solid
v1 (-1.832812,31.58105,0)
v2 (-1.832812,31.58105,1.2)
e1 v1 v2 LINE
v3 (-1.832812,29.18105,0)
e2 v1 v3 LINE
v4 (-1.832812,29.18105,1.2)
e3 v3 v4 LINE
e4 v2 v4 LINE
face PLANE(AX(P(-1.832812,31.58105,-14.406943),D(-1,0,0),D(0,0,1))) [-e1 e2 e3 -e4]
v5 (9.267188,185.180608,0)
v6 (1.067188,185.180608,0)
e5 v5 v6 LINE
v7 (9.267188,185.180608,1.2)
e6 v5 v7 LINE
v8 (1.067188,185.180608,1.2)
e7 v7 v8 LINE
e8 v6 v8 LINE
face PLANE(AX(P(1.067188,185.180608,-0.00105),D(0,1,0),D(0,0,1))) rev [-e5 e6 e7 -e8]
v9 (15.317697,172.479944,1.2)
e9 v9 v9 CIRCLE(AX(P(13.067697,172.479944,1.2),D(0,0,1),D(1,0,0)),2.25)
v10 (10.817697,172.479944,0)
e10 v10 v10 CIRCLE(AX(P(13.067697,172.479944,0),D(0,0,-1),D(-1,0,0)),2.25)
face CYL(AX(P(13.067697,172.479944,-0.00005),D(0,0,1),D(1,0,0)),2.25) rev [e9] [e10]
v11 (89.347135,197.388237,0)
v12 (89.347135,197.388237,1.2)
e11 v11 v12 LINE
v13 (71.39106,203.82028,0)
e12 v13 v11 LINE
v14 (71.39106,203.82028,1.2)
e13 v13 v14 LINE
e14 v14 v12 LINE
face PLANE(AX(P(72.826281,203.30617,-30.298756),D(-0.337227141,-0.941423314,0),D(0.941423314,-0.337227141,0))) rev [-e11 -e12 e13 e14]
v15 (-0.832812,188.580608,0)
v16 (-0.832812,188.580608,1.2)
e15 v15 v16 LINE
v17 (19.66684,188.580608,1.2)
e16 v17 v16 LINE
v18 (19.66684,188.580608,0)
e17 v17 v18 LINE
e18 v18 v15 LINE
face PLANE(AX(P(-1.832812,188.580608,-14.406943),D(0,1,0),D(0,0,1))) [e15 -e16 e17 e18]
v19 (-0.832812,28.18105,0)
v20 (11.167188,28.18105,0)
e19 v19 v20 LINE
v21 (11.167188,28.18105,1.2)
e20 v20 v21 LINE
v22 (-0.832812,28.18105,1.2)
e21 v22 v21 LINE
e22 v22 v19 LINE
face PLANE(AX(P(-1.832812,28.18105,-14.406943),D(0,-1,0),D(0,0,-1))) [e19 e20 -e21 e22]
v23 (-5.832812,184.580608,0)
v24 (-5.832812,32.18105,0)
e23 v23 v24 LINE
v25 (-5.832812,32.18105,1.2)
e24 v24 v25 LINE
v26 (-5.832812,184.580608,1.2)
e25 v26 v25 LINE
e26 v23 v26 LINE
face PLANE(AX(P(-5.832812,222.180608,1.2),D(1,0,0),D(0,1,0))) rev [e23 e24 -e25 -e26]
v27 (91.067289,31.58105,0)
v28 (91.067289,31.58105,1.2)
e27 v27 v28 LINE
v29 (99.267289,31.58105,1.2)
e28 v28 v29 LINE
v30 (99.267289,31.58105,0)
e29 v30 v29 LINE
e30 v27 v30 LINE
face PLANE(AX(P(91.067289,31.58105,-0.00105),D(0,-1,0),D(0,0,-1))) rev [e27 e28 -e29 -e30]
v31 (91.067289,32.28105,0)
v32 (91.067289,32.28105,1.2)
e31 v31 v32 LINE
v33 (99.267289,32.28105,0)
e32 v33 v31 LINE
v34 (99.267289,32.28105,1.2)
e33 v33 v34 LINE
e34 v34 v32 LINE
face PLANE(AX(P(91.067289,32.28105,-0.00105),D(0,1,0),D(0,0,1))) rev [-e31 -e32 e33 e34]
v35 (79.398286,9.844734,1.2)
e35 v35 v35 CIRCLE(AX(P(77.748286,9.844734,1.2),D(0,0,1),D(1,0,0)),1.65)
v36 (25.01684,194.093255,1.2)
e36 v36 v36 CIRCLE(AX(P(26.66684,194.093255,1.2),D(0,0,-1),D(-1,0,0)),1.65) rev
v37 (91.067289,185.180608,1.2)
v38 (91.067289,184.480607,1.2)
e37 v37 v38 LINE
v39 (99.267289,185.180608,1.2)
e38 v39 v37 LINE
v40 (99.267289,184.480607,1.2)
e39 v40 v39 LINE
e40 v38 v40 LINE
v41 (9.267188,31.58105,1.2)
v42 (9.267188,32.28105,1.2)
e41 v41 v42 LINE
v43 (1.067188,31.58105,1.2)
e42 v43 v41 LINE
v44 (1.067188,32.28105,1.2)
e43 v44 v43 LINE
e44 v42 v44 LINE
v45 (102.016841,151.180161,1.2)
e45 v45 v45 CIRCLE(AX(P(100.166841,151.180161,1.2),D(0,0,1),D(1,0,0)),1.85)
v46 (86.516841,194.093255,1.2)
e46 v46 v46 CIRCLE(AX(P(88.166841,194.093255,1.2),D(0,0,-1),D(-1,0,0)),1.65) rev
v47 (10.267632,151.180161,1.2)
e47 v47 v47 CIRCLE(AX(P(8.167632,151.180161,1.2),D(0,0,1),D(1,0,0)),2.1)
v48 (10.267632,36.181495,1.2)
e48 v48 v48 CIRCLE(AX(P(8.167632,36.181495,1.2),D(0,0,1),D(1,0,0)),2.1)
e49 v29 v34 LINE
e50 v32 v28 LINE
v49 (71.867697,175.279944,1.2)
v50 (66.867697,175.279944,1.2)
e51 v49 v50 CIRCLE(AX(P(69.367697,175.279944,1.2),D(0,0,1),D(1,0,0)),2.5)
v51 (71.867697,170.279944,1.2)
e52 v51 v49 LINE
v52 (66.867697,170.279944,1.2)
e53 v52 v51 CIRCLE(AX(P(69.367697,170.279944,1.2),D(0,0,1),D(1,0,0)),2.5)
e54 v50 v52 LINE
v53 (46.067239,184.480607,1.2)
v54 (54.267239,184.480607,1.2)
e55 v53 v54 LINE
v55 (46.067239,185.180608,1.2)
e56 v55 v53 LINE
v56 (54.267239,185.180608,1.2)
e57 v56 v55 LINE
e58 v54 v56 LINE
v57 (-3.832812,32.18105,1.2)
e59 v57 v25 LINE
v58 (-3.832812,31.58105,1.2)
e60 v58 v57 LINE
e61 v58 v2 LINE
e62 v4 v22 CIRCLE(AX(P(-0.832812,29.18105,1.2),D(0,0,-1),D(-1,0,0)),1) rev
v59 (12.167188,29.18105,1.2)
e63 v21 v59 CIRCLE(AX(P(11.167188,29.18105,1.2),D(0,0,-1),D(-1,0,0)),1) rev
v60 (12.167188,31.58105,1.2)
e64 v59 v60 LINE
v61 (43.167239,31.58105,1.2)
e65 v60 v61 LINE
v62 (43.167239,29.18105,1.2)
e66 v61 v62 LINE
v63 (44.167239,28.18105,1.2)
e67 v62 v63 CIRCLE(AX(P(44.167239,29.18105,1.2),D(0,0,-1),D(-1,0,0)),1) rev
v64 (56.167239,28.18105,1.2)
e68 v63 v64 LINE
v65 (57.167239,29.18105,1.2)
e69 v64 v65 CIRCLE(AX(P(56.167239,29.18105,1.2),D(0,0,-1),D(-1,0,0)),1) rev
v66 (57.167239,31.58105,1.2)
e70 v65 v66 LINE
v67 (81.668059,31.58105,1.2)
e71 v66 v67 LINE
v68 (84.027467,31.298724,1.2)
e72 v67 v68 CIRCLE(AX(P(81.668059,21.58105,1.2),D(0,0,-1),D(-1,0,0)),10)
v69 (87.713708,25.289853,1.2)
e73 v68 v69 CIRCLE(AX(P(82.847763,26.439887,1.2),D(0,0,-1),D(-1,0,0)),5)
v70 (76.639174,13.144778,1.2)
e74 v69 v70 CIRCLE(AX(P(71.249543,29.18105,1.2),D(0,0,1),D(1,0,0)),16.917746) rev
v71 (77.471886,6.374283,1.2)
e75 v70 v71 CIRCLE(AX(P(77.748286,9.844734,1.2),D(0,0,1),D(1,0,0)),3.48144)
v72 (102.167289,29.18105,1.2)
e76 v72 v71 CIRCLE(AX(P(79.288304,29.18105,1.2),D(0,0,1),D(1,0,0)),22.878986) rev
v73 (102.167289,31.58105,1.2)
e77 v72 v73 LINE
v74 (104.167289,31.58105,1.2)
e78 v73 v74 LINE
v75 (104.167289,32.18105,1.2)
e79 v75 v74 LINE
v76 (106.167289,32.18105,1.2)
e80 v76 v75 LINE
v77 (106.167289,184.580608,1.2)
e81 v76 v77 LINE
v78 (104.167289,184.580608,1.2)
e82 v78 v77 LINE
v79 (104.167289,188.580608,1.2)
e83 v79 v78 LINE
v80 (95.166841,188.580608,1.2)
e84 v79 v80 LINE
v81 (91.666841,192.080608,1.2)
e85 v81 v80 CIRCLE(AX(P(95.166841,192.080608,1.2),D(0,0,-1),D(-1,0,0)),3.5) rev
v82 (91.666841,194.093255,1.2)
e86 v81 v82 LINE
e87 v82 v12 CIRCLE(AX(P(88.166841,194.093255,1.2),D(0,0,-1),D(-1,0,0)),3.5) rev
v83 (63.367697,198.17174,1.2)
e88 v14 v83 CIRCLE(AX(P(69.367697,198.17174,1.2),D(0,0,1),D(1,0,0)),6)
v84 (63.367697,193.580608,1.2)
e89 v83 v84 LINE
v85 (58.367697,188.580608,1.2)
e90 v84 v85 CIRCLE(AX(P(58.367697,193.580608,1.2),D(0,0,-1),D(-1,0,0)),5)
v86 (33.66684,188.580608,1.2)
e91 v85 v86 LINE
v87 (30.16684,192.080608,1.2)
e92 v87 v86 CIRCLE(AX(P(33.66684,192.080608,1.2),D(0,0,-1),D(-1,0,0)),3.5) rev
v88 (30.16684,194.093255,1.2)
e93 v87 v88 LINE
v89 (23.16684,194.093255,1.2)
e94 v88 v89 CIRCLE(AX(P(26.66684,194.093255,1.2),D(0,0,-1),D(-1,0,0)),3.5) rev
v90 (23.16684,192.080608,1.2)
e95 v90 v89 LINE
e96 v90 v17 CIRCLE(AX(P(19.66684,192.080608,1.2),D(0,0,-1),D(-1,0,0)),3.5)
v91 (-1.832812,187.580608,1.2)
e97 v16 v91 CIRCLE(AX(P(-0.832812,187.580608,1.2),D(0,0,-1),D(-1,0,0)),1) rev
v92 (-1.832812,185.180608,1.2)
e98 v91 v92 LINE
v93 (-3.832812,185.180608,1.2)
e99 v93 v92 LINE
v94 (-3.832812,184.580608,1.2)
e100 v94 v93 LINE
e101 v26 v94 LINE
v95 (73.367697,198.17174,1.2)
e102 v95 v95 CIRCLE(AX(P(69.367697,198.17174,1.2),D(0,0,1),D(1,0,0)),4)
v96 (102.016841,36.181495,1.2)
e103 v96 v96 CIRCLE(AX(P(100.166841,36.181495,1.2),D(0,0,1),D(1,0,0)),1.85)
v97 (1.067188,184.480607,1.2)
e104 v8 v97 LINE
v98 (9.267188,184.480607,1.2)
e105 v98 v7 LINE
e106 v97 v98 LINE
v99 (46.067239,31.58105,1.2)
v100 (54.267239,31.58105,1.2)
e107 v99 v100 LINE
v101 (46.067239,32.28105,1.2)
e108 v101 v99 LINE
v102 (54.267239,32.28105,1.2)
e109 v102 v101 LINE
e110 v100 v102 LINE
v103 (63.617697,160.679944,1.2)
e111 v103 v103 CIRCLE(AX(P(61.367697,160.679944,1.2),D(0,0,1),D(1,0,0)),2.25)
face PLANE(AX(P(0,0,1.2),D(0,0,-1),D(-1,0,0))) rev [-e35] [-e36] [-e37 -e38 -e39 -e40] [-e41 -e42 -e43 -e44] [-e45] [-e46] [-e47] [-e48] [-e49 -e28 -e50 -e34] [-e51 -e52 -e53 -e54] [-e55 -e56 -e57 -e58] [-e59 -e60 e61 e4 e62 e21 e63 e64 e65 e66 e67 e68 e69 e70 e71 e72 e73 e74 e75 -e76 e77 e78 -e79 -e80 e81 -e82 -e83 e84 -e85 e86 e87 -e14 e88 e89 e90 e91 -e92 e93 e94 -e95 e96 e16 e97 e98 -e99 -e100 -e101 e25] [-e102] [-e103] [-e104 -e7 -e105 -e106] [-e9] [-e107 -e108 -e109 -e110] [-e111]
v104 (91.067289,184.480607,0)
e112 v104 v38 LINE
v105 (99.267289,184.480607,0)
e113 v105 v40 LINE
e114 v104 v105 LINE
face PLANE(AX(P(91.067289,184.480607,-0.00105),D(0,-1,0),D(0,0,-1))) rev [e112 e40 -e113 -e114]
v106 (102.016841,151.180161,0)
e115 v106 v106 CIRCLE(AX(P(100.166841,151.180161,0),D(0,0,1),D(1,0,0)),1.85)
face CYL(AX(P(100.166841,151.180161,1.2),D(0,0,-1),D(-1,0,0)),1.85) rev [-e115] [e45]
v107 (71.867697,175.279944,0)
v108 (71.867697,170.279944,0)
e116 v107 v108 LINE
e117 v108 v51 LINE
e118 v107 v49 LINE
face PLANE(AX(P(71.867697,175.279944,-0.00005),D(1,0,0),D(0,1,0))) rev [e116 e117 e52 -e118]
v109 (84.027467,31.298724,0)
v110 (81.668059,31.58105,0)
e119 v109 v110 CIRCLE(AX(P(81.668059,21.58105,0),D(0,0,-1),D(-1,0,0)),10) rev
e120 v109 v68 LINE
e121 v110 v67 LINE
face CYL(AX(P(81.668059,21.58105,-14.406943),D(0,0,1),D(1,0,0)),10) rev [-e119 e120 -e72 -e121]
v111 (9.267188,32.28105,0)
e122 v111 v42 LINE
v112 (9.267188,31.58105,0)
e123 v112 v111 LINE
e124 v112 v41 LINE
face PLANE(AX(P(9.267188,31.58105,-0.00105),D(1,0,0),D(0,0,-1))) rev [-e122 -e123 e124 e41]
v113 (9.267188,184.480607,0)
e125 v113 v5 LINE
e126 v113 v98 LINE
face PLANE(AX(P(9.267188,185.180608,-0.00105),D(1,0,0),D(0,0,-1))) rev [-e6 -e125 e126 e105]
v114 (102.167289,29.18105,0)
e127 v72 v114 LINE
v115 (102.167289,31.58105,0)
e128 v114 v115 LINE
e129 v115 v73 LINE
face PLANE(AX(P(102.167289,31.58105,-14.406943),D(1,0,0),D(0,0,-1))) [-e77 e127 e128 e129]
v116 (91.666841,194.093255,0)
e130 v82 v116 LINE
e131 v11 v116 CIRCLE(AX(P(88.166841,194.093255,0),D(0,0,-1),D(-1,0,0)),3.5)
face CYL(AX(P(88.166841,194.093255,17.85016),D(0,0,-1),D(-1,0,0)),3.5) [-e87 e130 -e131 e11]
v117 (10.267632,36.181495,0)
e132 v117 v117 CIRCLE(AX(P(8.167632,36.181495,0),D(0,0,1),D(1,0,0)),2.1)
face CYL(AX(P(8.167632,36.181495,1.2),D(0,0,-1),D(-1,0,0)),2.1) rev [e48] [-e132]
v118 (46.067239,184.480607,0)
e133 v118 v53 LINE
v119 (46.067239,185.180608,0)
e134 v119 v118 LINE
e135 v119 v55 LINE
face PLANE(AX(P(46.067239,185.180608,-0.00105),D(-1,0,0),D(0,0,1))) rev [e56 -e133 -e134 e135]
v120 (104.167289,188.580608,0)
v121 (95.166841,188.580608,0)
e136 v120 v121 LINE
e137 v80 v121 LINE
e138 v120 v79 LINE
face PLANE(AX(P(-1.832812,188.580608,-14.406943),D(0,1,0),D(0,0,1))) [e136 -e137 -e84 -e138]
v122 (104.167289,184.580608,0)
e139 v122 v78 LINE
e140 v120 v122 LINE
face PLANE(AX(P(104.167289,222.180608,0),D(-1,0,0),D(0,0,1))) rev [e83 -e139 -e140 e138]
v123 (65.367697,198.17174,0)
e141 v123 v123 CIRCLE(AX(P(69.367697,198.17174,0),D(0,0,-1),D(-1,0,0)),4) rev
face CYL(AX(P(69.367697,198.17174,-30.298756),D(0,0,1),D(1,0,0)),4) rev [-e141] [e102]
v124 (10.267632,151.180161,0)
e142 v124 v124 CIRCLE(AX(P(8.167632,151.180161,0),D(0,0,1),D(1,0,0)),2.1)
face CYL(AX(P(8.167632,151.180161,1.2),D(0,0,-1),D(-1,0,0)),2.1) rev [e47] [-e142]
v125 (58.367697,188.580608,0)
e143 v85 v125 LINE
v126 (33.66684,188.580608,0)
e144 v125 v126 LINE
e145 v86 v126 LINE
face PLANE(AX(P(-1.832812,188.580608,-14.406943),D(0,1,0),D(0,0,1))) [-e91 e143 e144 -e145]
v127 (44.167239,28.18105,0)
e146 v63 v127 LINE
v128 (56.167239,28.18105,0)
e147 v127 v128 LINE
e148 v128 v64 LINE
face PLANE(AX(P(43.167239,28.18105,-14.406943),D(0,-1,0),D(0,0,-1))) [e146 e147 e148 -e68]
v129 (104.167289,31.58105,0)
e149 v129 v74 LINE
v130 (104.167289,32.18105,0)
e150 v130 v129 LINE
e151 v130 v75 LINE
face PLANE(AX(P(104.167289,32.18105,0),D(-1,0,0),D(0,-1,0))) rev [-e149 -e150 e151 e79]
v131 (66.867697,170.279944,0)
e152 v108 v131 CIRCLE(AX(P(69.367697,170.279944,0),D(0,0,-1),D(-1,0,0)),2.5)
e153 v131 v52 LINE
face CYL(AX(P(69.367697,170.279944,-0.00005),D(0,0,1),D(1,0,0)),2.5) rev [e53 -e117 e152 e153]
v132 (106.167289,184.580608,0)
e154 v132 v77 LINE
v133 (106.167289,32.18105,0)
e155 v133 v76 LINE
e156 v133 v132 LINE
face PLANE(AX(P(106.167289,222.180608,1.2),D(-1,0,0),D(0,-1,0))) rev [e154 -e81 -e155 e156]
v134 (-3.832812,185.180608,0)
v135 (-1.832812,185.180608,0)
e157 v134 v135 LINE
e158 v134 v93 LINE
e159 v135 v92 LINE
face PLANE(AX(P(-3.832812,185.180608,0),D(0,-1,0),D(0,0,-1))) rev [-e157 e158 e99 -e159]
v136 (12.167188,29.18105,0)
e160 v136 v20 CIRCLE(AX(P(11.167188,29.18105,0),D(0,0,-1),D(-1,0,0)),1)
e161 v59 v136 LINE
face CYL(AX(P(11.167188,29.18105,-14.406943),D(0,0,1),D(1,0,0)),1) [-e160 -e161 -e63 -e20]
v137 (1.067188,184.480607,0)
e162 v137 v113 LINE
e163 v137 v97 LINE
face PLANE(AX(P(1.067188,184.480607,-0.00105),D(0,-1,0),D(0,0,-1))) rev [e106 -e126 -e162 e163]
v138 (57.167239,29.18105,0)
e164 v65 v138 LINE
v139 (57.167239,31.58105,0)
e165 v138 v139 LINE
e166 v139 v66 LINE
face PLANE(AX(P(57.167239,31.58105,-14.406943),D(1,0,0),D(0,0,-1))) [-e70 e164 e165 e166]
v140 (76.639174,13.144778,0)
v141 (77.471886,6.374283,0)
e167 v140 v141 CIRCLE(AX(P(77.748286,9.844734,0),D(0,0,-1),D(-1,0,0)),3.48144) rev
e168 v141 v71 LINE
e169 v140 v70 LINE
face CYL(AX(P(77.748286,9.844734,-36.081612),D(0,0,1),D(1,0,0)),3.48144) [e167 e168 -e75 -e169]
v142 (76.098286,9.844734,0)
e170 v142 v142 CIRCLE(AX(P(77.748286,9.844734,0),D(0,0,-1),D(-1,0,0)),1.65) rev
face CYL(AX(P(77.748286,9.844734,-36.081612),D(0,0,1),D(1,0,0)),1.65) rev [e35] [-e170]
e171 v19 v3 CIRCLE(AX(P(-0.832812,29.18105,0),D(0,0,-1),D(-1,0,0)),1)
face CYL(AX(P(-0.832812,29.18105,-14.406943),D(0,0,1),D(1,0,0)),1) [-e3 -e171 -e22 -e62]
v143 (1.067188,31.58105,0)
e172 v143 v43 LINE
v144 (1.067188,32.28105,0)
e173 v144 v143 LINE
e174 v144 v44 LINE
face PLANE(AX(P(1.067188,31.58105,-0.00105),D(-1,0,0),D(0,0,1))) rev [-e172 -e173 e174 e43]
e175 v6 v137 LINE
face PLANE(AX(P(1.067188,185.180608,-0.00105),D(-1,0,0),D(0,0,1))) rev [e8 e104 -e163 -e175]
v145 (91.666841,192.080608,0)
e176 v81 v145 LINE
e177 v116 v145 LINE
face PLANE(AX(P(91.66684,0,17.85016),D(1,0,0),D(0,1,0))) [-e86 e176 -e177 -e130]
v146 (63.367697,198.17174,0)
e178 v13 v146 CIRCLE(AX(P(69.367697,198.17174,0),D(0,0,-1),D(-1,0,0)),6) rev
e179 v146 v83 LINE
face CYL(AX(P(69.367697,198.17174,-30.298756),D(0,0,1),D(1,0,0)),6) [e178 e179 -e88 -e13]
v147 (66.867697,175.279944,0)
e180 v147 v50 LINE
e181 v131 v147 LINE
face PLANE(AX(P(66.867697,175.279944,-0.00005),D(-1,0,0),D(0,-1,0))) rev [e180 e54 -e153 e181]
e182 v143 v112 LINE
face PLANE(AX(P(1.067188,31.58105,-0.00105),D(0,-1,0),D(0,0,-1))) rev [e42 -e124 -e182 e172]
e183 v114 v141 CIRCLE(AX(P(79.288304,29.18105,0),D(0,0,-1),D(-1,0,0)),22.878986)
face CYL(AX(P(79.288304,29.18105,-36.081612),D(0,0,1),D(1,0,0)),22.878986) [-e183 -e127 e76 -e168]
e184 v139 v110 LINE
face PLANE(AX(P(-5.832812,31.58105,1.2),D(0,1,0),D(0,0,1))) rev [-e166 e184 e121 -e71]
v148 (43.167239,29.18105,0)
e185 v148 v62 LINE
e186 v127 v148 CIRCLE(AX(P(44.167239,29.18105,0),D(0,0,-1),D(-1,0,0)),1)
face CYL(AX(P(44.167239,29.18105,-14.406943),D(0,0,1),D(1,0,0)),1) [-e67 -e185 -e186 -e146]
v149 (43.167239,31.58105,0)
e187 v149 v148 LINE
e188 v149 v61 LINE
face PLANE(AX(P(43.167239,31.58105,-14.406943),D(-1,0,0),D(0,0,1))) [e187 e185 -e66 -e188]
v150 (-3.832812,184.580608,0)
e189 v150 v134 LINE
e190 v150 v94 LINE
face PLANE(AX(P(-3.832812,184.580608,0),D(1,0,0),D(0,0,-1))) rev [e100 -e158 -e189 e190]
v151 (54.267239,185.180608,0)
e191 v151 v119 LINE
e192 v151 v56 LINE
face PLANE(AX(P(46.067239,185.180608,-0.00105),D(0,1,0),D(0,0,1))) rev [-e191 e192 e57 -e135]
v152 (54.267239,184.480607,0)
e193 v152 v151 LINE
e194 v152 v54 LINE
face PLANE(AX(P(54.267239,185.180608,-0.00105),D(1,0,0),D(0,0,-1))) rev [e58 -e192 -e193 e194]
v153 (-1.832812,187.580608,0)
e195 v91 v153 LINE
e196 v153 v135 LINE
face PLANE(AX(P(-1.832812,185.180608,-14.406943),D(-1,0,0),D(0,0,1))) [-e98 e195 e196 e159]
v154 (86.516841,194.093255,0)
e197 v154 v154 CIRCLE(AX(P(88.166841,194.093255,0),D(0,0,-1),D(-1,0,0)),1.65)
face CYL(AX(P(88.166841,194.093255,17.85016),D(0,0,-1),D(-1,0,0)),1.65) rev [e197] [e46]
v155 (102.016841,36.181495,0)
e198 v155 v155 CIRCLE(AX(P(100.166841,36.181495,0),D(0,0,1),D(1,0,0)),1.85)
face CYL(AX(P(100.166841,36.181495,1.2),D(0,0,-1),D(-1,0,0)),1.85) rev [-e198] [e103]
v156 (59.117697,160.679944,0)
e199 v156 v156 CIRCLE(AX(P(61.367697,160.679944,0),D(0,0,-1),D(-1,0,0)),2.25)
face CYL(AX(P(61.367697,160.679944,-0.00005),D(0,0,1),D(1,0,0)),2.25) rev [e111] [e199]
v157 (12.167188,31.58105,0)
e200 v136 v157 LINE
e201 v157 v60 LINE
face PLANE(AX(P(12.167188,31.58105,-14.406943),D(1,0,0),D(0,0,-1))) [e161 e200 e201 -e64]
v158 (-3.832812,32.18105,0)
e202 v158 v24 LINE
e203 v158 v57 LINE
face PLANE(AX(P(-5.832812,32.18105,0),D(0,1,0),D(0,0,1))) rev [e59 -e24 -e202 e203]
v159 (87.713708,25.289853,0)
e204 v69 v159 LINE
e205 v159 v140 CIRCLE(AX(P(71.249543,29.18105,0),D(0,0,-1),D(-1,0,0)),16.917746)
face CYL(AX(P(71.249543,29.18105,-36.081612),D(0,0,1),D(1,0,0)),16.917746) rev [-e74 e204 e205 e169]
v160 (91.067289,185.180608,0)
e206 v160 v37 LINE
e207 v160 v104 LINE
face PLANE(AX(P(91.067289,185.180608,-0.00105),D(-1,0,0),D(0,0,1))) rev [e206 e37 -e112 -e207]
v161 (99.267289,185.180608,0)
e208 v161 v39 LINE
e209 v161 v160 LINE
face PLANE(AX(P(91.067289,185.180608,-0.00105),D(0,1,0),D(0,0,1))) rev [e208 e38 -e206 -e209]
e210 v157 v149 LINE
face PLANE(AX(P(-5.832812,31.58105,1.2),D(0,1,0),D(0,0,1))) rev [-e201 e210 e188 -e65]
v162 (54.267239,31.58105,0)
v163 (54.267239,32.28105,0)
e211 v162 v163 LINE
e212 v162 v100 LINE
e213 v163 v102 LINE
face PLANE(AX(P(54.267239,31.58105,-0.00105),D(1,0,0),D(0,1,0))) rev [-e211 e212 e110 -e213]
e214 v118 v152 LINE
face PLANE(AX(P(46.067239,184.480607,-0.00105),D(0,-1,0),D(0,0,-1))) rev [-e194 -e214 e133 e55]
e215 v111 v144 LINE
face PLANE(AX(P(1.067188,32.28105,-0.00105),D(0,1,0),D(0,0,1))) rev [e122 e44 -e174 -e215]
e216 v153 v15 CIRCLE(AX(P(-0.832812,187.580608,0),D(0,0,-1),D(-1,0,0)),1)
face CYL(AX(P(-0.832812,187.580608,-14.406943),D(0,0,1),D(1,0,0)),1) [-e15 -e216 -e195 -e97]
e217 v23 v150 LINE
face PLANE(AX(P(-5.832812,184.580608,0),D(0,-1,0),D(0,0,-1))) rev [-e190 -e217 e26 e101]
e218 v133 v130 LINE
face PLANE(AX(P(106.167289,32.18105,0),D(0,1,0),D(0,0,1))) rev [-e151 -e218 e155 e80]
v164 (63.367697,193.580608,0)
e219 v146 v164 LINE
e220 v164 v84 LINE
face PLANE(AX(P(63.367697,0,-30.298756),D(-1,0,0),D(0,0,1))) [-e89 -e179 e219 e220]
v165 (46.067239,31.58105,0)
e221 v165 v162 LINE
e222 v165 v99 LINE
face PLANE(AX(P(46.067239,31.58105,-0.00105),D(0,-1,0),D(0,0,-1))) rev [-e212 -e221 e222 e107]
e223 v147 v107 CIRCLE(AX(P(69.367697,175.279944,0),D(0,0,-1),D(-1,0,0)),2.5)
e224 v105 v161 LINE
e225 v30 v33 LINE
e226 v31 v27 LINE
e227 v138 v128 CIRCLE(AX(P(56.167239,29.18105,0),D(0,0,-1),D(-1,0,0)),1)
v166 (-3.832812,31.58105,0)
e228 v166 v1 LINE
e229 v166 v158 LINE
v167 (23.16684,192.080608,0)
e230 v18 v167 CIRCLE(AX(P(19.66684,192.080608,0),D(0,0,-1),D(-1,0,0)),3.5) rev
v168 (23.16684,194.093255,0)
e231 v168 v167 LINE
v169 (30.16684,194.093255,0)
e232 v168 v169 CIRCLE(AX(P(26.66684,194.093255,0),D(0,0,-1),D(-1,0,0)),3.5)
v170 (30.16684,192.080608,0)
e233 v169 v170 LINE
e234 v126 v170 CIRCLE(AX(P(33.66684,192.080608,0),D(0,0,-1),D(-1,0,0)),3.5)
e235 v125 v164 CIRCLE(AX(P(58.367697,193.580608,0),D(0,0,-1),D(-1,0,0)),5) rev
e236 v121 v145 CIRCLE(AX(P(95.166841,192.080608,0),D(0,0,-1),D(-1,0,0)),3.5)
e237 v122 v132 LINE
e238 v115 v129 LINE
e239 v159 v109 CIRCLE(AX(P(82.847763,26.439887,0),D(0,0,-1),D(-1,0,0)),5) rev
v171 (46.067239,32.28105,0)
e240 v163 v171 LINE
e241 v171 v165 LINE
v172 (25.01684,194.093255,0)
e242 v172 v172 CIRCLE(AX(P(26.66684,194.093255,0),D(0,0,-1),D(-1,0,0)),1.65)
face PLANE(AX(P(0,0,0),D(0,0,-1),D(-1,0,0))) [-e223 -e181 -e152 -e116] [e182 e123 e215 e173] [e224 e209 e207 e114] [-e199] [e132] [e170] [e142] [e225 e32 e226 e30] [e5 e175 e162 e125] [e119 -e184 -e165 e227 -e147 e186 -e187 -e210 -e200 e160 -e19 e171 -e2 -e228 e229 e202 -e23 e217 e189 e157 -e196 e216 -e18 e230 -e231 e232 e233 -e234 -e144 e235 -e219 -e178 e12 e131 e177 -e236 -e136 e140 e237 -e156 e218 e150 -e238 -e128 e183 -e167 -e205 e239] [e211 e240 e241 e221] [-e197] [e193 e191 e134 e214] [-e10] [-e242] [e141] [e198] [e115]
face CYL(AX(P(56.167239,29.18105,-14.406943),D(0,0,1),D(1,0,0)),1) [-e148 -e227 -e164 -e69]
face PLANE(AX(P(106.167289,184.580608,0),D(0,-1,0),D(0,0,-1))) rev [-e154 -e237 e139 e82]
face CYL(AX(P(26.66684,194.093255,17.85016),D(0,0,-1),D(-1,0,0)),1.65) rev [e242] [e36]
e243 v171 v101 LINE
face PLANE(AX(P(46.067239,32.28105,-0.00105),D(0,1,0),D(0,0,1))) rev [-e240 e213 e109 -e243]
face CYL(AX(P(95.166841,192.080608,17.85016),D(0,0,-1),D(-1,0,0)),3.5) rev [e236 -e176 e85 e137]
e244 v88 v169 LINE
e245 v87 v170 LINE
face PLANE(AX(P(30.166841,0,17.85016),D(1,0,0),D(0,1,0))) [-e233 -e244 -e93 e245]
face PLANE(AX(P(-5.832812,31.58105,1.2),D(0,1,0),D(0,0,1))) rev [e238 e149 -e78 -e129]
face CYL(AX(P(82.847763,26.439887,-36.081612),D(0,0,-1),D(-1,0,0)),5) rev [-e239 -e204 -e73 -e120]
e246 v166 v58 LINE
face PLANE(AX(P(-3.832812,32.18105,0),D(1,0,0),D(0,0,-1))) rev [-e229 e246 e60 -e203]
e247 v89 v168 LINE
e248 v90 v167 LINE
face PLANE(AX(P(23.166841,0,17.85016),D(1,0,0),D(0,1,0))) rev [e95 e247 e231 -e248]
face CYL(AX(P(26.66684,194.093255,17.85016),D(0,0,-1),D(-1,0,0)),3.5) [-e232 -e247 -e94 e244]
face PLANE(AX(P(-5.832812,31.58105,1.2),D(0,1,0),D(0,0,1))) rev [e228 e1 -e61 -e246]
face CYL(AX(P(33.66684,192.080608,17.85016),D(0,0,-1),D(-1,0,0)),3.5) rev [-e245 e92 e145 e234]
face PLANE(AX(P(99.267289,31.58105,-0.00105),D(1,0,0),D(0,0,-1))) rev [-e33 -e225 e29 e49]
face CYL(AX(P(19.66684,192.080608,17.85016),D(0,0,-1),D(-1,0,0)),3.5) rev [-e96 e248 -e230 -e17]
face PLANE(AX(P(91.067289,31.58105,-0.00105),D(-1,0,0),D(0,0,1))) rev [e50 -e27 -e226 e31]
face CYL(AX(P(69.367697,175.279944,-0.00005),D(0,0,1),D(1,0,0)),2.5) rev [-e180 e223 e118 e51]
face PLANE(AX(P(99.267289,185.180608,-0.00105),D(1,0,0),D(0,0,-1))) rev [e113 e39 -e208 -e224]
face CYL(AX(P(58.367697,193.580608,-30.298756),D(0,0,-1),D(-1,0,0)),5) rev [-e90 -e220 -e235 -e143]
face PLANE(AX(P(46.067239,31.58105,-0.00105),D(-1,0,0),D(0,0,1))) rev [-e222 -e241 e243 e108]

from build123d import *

# Parameters (mm, degrees)
SKETCH2_W           = 112.00010125
SKETCH2_H           = 190.5995575
SKETCH2_R           = 2.1
SKETCH2_R_2         = 1.85
BOSS_EXTRUDE1_DEPTH = 1.2
SKETCH5_W           = 2
SKETCH5_H           = 37.6
SKETCH5_H_2         = 0.6
CUT_EXTRUDE2_DEPTH  = 247.246128205
CUT_EXTRUDE1_DEPTH  = 247.246128205
SKETCH9_W           = 14
SKETCH9_H           = 3.4
SKETCH9_W_2         = 8.5
BOSS_EXTRUDE5_DEPTH = 1.2
FILLET1_R           = 1
CUT_EXTRUDE4_REACH  = 248.246
SKETCH10_W          = 8.2
SKETCH10_H          = 0.7
SKETCH11_R          = 2.25
CUT_EXTRUDE5_DEPTH  = 247.246128205
BOSS_EXTRUDE6_DEPTH = 1.2
SKETCH13_R          = 1.635773904
CUT_EXTRUDE6_DEPTH  = 248.202612706
SKETCH15_W          = 166.29246115
SKETCH15_H          = 51.52086731
CUT_EXTRUDE7_DEPTH  = 10
SKETCH17_R          = 1.65
BOSS_EXTRUDE7_DEPTH = 1.2
BOSS_EXTRUDE8_START = -1.2
SKETCH18_R          = 1.65
BOSS_EXTRUDE8_DEPTH = 1.2
BOSS_EXTRUDE9_START = -1.2
SKETCH19_R          = 4
BOSS_EXTRUDE9_DEPTH = 1.2
FILLET3_R           = 5
FILLET8_R           = 10
FILLET10_R          = 5


with BuildPart() as part:
    # Sketch2 → Boss-Extrude1 (new body)
    with BuildSketch(Plane.XY):
        with Locations((50.167238625, 126.88082875)):
            Rectangle(SKETCH2_W, SKETCH2_H)
        with Locations((8.16763175, 151.180160625)):
            Circle(SKETCH2_R, mode=Mode.SUBTRACT)
        with Locations((100.1668405, 151.180160625)):
            Circle(SKETCH2_R_2, mode=Mode.SUBTRACT)
        with Locations((100.1668405, 36.181495)):
            Circle(SKETCH2_R_2, mode=Mode.SUBTRACT)
        with Locations((8.16763175, 36.181495)):
            Circle(SKETCH2_R, mode=Mode.SUBTRACT)
    extrude(amount=BOSS_EXTRUDE1_DEPTH)

    # Sketch5 → Cut-Extrude2 (cut, through all)
    with BuildSketch(Plane.XY.offset(1.2)):
        Polygon((-3.832812, 185.1806075), (6.667188, 185.1806075), (6.667188, 222.1806075), (-5.832812, 222.1806075), (-5.832812, 185.1806075), (-5.832812, 184.5806075), (-3.832812, 184.5806075), align=None)
        with Locations((105.16728925, 203.3806075)):
            Rectangle(SKETCH5_W, SKETCH5_H)
        with Locations((-4.832812, 31.88105)):
            Rectangle(SKETCH5_W, SKETCH5_H_2)
        with Locations((105.16728925, 31.88105)):
            Rectangle(SKETCH5_W, SKETCH5_H_2)
    extrude(amount=-CUT_EXTRUDE2_DEPTH, mode=Mode.SUBTRACT)

    # Sketch4 → Cut-Extrude1 (cut, through all)
    with BuildSketch(Plane.XY.offset(1.2)):
        with BuildLine():
            Line((55.16728925, 218.1806075), (98.16728925, 218.1806075))
            ThreePointArc((98.16728925, 218.1806075), (99.581502812, 217.594821062), (100.16728925, 216.1806075))
            Line((100.16728925, 216.1806075), (100.16728925, 192.1806075))
            ThreePointArc((100.16728925, 192.1806075), (99.581502812, 190.766393938), (98.16728925, 190.1806075))
            Line((98.16728925, 190.1806075), (55.16728925, 190.1806075))
            ThreePointArc((55.16728925, 190.1806075), (53.753075688, 190.766393938), (53.16728925, 192.1806075))
            Line((53.16728925, 192.1806075), (53.16728925, 216.1806075))
            ThreePointArc((53.16728925, 216.1806075), (53.753075688, 217.594821062), (55.16728925, 218.1806075))
        make_face()
    extrude(amount=-CUT_EXTRUDE1_DEPTH, mode=Mode.SUBTRACT)

    # Sketch9 → Boss-Extrude5 (add)
    with BuildSketch(Plane.XY.offset(1.2)):
        with Locations((5.167188, 29.88105)):
            Rectangle(SKETCH9_W, SKETCH9_H)
        with Locations((95.16728925, 29.88105)):
            Rectangle(SKETCH9_W, SKETCH9_H)
        with Locations((50.167238625, 29.88105)):
            Rectangle(SKETCH9_W, SKETCH9_H)
        with Locations((2.417188, 186.8806075)):
            Rectangle(SKETCH9_W_2, SKETCH9_H)
    extrude(amount=-BOSS_EXTRUDE5_DEPTH)

    # Fillet1
    fillet1_edges = [part.edges().sort_by_distance(p)[0] for p in [
        (102.16728925, 28.18105, 0.6),
        (88.16728925, 28.18105, 0.6),
        (57.167238625, 28.18105, 0.6),
        (43.167238625, 28.18105, 0.6),
        (12.167188, 28.18105, 0.6),
        (-1.832812, 28.18105, 0.6),
        (-1.832812, 188.5806075, 0.6),
    ]]
    fillet(fillet1_edges, radius=FILLET1_R)

    # Sketch10 → Cut-Extrude4 (cut, up to next)
    with BuildSketch(Plane.XY.offset(1.2), mode=Mode.PRIVATE) as cut_extrude4_sk1:
        with Locations((95.16728925, 31.93105)):
            Rectangle(SKETCH10_W, SKETCH10_H)
    cut_extrude4_tool1 = extrude(cut_extrude4_sk1.sketch, amount=-CUT_EXTRUDE4_REACH, mode=Mode.PRIVATE) & part.part
    # Sketch10 → Cut-Extrude4 (cut, up to next)
    with BuildSketch(Plane.XY.offset(1.2), mode=Mode.PRIVATE) as cut_extrude4_sk2:
        with Locations((50.167238625, 31.93105)):
            Rectangle(SKETCH10_W, SKETCH10_H)
    cut_extrude4_tool2 = extrude(cut_extrude4_sk2.sketch, amount=-CUT_EXTRUDE4_REACH, mode=Mode.PRIVATE) & part.part
    # Sketch10 → Cut-Extrude4 (cut, up to next)
    with BuildSketch(Plane.XY.offset(1.2), mode=Mode.PRIVATE) as cut_extrude4_sk3:
        with Locations((5.167188, 31.93105)):
            Rectangle(SKETCH10_W, SKETCH10_H)
    cut_extrude4_tool3 = extrude(cut_extrude4_sk3.sketch, amount=-CUT_EXTRUDE4_REACH, mode=Mode.PRIVATE) & part.part
    # Sketch10 → Cut-Extrude4 (cut, up to next)
    with BuildSketch(Plane.XY.offset(1.2), mode=Mode.PRIVATE) as cut_extrude4_sk4:
        with Locations((50.167238625, 184.8306075)):
            Rectangle(SKETCH10_W, SKETCH10_H)
    cut_extrude4_tool4 = extrude(cut_extrude4_sk4.sketch, amount=-CUT_EXTRUDE4_REACH, mode=Mode.PRIVATE) & part.part
    # Sketch10 → Cut-Extrude4 (cut, up to next)
    with BuildSketch(Plane.XY.offset(1.2), mode=Mode.PRIVATE) as cut_extrude4_sk5:
        with Locations((95.16728925, 184.8306075)):
            Rectangle(SKETCH10_W, SKETCH10_H)
    cut_extrude4_tool5 = extrude(cut_extrude4_sk5.sketch, amount=-CUT_EXTRUDE4_REACH, mode=Mode.PRIVATE) & part.part
    # Sketch10 → Cut-Extrude4 (cut, up to next)
    with BuildSketch(Plane.XY.offset(1.2), mode=Mode.PRIVATE) as cut_extrude4_sk6:
        with Locations((5.167188, 184.8306075)):
            Rectangle(SKETCH10_W, SKETCH10_H)
    cut_extrude4_tool6 = extrude(cut_extrude4_sk6.sketch, amount=-CUT_EXTRUDE4_REACH, mode=Mode.PRIVATE) & part.part
    add(cut_extrude4_tool1.solids().sort_by_distance((95.167289, 31.93105, 1.2))[0], mode=Mode.SUBTRACT)
    add(cut_extrude4_tool2.solids().sort_by_distance((50.167239, 31.93105, 1.2))[0], mode=Mode.SUBTRACT)
    add(cut_extrude4_tool3.solids().sort_by_distance((5.167188, 31.93105, 1.2))[0], mode=Mode.SUBTRACT)
    add(cut_extrude4_tool4.solids().sort_by_distance((50.167239, 184.830607, 1.2))[0], mode=Mode.SUBTRACT)
    add(cut_extrude4_tool5.solids().sort_by_distance((95.167289, 184.830607, 1.2))[0], mode=Mode.SUBTRACT)
    add(cut_extrude4_tool6.solids().sort_by_distance((5.167188, 184.830607, 1.2))[0], mode=Mode.SUBTRACT)

    # Sketch11 → Cut-Extrude5 (cut, through all)
    with BuildSketch(Plane.XY.offset(1.2)):
        with Locations((61.367697375, 160.67994375)):
            Circle(SKETCH11_R)
        with Locations((13.067697375, 172.47994375)):
            Circle(SKETCH11_R)
        with BuildLine():
            Line((71.867697375, 175.27994375), (71.867697375, 170.27994375))
            ThreePointArc((71.867697375, 170.27994375), (69.367697375, 167.77994375), (66.867697375, 170.27994375))
            Line((66.867697375, 170.27994375), (66.867697375, 175.27994375))
            ThreePointArc((66.867697375, 175.27994375), (69.367697375, 177.77994375), (71.867697375, 175.27994375))
        make_face()
    extrude(amount=-CUT_EXTRUDE5_DEPTH, mode=Mode.SUBTRACT)

    # Sketch12 → Boss-Extrude6 (add)
    with BuildSketch(Plane.XY.offset(1.2)):
        with BuildLine():
            Line((104.16728925, 222.1806075), (104.16728925, 213.7806075))
            ThreePointArc((104.16728925, 213.7806075), (108.36728925, 217.9806075), (104.16728925, 222.1806075))
        make_face()
    extrude(amount=-BOSS_EXTRUDE6_DEPTH)

    # Sketch13 → Cut-Extrude6 (cut, through all)
    with BuildSketch(Plane.XY.offset(1.2)):
        with Locations((104.16728925, 217.9806075)):
            Circle(SKETCH13_R)
        with Locations((47.16728925, 217.9806075)):
            Circle(SKETCH13_R)
        with Locations((10.667188, 217.9806075)):
            Circle(SKETCH13_R)
    extrude(amount=-CUT_EXTRUDE6_DEPTH, mode=Mode.SUBTRACT)

    # Sketch15 → Cut-Extrude7 (cut)
    with BuildSketch(Plane.XY.offset(1.2)):
        with Locations((89.813418575, 214.341041155)):
            Rectangle(SKETCH15_W, SKETCH15_H)
    extrude(amount=-CUT_EXTRUDE7_DEPTH, mode=Mode.SUBTRACT)

    # Sketch17 → Boss-Extrude7 (add)
    # profile 1 of 2: a face of its own
    with BuildSketch(Plane(origin=(0, 0, 0), x_dir=(-1, 0, 0), z_dir=(0, 0, -1))):
        with BuildLine():
            Line((-81.1668405, 188.5806075), (-95.1668405, 188.5806075))
            ThreePointArc((-95.1668405, 188.5806075), (-92.691966766, 189.605733766), (-91.6668405, 192.0806075))
            Line((-91.6668405, 192.0806075), (-91.6668405, 194.093254991))
            ThreePointArc((-91.6668405, 194.093254991), (-88.1668405, 197.593254991), (-84.6668405, 194.093254991))
            Line((-84.6668405, 194.093254991), (-84.6668405, 192.0806075))
            ThreePointArc((-84.6668405, 192.0806075), (-83.641714234, 189.605733766), (-81.1668405, 188.5806075))
        make_face()
        with Locations((-88.1668405, 194.093254991)):
            Circle(SKETCH17_R, mode=Mode.SUBTRACT)
    # profile 2 of 2: a face of its own
    with BuildSketch(Plane(origin=(0, 0, 0), x_dir=(-1, 0, 0), z_dir=(0, 0, -1))):
        with BuildLine():
            Line((-19.6668405, 188.5806075), (-33.6668405, 188.5806075))
            ThreePointArc((-33.6668405, 188.5806075), (-31.191966766, 189.605733766), (-30.1668405, 192.0806075))
            Line((-30.1668405, 192.0806075), (-30.1668405, 194.093254991))
            ThreePointArc((-30.1668405, 194.093254991), (-26.6668405, 197.593254991), (-23.1668405, 194.093254991))
            Line((-23.1668405, 194.093254991), (-23.1668405, 192.0806075))
            ThreePointArc((-23.1668405, 192.0806075), (-22.141714234, 189.605733766), (-19.6668405, 188.5806075))
        make_face()
        with Locations((-26.6668405, 194.093254991)):
            Circle(SKETCH17_R, mode=Mode.SUBTRACT)
    extrude(amount=-BOSS_EXTRUDE7_DEPTH)

    # Sketch18 → Boss-Extrude8 (add)
    with BuildSketch(Plane.XY.offset(1.2).offset(BOSS_EXTRUDE8_START)):
        with BuildLine():
            Line((89.16728925, 28.18105), (101.16728925, 28.18105))
            ThreePointArc((101.16728925, 28.18105), (101.874396031, 28.473943219), (102.16728925, 29.18105))
            ThreePointArc((102.16728925, 29.18105), (94.810709764, 12.373227692), (77.471885747, 6.374283268))
            ThreePointArc((77.471885747, 6.374283268), (74.292882483, 9.419749119), (76.639173718, 13.144778172))
            ThreePointArc((76.639173718, 13.144778172), (84.986182742, 19.306088457), (88.16728925, 29.18105))
            ThreePointArc((88.16728925, 29.18105), (88.460182469, 28.473943219), (89.16728925, 28.18105))
        make_face()
        with Locations((77.748285655, 9.844733678)):
            Circle(SKETCH18_R, mode=Mode.SUBTRACT)
    extrude(amount=BOSS_EXTRUDE8_DEPTH)

    # Sketch19 → Boss-Extrude9 (add)
    with BuildSketch(Plane.XY.offset(1.2).offset(BOSS_EXTRUDE9_START)):
        with BuildLine():
            Line((63.367697375, 188.5806075), (81.1668405, 188.5806075))
            ThreePointArc((81.1668405, 188.5806075), (83.641714234, 189.605733766), (84.6668405, 192.0806075))
            Line((84.6668405, 192.0806075), (84.6668405, 194.093254991))
            ThreePointArc((84.6668405, 194.093254991), (86.152024438, 196.955162788), (89.347135493, 197.388236588))
            Line((89.347135493, 197.388236588), (71.39106022, 203.820280323))
            ThreePointArc((71.39106022, 203.820280323), (65.913726984, 203.077868093), (63.367697375, 198.171740441))
            Line((63.367697375, 198.171740441), (63.367697375, 188.5806075))
        make_face()
        with Locations((69.367697375, 198.171740441)):
            Circle(SKETCH19_R, mode=Mode.SUBTRACT)
    extrude(amount=BOSS_EXTRUDE9_DEPTH)

    # Fillet3
    fillet3_edges = [part.edges().sort_by_distance(p)[0] for p in [
        (63.367697375, 188.5806075, 0.6),
    ]]
    fillet(fillet3_edges, radius=FILLET3_R)

    # Fillet8
    # the kernel refuses this fillet: 10 mm, written as the material it adds along each edge
    with BuildSketch(Plane(origin=(88.16728925, 31.58105, 1.2), x_dir=(0, -1, 0), z_dir=(0, 0, -1))) as fillet8_piece_1:
        with BuildLine():
            CenterArc((10, 6.499230724), FILLET8_R, 180, 40.535802111)
            Line((0, 6.499230724), (-0.2, 6.499230724))
            Line((-0.2, 6.499230724), (-0.2, 0))
            Line((-0.2, 0), (0, -0.2))
            ThreePointArc((0, -0.2), (1.2, -0.2), (2.248, -0.129984614))
            Line((2.248, -0.129984614), (2.4, 0))
        make_face()
    extrude(amount=1.2)

    # Fillet10
    fillet10_edges = [part.edges().sort_by_distance(p)[0] for p in [
        (88.16728925, 29.18105, 0.6),
    ]]
    fillet(fillet10_edges, radius=FILLET10_R)


solid = part.part
